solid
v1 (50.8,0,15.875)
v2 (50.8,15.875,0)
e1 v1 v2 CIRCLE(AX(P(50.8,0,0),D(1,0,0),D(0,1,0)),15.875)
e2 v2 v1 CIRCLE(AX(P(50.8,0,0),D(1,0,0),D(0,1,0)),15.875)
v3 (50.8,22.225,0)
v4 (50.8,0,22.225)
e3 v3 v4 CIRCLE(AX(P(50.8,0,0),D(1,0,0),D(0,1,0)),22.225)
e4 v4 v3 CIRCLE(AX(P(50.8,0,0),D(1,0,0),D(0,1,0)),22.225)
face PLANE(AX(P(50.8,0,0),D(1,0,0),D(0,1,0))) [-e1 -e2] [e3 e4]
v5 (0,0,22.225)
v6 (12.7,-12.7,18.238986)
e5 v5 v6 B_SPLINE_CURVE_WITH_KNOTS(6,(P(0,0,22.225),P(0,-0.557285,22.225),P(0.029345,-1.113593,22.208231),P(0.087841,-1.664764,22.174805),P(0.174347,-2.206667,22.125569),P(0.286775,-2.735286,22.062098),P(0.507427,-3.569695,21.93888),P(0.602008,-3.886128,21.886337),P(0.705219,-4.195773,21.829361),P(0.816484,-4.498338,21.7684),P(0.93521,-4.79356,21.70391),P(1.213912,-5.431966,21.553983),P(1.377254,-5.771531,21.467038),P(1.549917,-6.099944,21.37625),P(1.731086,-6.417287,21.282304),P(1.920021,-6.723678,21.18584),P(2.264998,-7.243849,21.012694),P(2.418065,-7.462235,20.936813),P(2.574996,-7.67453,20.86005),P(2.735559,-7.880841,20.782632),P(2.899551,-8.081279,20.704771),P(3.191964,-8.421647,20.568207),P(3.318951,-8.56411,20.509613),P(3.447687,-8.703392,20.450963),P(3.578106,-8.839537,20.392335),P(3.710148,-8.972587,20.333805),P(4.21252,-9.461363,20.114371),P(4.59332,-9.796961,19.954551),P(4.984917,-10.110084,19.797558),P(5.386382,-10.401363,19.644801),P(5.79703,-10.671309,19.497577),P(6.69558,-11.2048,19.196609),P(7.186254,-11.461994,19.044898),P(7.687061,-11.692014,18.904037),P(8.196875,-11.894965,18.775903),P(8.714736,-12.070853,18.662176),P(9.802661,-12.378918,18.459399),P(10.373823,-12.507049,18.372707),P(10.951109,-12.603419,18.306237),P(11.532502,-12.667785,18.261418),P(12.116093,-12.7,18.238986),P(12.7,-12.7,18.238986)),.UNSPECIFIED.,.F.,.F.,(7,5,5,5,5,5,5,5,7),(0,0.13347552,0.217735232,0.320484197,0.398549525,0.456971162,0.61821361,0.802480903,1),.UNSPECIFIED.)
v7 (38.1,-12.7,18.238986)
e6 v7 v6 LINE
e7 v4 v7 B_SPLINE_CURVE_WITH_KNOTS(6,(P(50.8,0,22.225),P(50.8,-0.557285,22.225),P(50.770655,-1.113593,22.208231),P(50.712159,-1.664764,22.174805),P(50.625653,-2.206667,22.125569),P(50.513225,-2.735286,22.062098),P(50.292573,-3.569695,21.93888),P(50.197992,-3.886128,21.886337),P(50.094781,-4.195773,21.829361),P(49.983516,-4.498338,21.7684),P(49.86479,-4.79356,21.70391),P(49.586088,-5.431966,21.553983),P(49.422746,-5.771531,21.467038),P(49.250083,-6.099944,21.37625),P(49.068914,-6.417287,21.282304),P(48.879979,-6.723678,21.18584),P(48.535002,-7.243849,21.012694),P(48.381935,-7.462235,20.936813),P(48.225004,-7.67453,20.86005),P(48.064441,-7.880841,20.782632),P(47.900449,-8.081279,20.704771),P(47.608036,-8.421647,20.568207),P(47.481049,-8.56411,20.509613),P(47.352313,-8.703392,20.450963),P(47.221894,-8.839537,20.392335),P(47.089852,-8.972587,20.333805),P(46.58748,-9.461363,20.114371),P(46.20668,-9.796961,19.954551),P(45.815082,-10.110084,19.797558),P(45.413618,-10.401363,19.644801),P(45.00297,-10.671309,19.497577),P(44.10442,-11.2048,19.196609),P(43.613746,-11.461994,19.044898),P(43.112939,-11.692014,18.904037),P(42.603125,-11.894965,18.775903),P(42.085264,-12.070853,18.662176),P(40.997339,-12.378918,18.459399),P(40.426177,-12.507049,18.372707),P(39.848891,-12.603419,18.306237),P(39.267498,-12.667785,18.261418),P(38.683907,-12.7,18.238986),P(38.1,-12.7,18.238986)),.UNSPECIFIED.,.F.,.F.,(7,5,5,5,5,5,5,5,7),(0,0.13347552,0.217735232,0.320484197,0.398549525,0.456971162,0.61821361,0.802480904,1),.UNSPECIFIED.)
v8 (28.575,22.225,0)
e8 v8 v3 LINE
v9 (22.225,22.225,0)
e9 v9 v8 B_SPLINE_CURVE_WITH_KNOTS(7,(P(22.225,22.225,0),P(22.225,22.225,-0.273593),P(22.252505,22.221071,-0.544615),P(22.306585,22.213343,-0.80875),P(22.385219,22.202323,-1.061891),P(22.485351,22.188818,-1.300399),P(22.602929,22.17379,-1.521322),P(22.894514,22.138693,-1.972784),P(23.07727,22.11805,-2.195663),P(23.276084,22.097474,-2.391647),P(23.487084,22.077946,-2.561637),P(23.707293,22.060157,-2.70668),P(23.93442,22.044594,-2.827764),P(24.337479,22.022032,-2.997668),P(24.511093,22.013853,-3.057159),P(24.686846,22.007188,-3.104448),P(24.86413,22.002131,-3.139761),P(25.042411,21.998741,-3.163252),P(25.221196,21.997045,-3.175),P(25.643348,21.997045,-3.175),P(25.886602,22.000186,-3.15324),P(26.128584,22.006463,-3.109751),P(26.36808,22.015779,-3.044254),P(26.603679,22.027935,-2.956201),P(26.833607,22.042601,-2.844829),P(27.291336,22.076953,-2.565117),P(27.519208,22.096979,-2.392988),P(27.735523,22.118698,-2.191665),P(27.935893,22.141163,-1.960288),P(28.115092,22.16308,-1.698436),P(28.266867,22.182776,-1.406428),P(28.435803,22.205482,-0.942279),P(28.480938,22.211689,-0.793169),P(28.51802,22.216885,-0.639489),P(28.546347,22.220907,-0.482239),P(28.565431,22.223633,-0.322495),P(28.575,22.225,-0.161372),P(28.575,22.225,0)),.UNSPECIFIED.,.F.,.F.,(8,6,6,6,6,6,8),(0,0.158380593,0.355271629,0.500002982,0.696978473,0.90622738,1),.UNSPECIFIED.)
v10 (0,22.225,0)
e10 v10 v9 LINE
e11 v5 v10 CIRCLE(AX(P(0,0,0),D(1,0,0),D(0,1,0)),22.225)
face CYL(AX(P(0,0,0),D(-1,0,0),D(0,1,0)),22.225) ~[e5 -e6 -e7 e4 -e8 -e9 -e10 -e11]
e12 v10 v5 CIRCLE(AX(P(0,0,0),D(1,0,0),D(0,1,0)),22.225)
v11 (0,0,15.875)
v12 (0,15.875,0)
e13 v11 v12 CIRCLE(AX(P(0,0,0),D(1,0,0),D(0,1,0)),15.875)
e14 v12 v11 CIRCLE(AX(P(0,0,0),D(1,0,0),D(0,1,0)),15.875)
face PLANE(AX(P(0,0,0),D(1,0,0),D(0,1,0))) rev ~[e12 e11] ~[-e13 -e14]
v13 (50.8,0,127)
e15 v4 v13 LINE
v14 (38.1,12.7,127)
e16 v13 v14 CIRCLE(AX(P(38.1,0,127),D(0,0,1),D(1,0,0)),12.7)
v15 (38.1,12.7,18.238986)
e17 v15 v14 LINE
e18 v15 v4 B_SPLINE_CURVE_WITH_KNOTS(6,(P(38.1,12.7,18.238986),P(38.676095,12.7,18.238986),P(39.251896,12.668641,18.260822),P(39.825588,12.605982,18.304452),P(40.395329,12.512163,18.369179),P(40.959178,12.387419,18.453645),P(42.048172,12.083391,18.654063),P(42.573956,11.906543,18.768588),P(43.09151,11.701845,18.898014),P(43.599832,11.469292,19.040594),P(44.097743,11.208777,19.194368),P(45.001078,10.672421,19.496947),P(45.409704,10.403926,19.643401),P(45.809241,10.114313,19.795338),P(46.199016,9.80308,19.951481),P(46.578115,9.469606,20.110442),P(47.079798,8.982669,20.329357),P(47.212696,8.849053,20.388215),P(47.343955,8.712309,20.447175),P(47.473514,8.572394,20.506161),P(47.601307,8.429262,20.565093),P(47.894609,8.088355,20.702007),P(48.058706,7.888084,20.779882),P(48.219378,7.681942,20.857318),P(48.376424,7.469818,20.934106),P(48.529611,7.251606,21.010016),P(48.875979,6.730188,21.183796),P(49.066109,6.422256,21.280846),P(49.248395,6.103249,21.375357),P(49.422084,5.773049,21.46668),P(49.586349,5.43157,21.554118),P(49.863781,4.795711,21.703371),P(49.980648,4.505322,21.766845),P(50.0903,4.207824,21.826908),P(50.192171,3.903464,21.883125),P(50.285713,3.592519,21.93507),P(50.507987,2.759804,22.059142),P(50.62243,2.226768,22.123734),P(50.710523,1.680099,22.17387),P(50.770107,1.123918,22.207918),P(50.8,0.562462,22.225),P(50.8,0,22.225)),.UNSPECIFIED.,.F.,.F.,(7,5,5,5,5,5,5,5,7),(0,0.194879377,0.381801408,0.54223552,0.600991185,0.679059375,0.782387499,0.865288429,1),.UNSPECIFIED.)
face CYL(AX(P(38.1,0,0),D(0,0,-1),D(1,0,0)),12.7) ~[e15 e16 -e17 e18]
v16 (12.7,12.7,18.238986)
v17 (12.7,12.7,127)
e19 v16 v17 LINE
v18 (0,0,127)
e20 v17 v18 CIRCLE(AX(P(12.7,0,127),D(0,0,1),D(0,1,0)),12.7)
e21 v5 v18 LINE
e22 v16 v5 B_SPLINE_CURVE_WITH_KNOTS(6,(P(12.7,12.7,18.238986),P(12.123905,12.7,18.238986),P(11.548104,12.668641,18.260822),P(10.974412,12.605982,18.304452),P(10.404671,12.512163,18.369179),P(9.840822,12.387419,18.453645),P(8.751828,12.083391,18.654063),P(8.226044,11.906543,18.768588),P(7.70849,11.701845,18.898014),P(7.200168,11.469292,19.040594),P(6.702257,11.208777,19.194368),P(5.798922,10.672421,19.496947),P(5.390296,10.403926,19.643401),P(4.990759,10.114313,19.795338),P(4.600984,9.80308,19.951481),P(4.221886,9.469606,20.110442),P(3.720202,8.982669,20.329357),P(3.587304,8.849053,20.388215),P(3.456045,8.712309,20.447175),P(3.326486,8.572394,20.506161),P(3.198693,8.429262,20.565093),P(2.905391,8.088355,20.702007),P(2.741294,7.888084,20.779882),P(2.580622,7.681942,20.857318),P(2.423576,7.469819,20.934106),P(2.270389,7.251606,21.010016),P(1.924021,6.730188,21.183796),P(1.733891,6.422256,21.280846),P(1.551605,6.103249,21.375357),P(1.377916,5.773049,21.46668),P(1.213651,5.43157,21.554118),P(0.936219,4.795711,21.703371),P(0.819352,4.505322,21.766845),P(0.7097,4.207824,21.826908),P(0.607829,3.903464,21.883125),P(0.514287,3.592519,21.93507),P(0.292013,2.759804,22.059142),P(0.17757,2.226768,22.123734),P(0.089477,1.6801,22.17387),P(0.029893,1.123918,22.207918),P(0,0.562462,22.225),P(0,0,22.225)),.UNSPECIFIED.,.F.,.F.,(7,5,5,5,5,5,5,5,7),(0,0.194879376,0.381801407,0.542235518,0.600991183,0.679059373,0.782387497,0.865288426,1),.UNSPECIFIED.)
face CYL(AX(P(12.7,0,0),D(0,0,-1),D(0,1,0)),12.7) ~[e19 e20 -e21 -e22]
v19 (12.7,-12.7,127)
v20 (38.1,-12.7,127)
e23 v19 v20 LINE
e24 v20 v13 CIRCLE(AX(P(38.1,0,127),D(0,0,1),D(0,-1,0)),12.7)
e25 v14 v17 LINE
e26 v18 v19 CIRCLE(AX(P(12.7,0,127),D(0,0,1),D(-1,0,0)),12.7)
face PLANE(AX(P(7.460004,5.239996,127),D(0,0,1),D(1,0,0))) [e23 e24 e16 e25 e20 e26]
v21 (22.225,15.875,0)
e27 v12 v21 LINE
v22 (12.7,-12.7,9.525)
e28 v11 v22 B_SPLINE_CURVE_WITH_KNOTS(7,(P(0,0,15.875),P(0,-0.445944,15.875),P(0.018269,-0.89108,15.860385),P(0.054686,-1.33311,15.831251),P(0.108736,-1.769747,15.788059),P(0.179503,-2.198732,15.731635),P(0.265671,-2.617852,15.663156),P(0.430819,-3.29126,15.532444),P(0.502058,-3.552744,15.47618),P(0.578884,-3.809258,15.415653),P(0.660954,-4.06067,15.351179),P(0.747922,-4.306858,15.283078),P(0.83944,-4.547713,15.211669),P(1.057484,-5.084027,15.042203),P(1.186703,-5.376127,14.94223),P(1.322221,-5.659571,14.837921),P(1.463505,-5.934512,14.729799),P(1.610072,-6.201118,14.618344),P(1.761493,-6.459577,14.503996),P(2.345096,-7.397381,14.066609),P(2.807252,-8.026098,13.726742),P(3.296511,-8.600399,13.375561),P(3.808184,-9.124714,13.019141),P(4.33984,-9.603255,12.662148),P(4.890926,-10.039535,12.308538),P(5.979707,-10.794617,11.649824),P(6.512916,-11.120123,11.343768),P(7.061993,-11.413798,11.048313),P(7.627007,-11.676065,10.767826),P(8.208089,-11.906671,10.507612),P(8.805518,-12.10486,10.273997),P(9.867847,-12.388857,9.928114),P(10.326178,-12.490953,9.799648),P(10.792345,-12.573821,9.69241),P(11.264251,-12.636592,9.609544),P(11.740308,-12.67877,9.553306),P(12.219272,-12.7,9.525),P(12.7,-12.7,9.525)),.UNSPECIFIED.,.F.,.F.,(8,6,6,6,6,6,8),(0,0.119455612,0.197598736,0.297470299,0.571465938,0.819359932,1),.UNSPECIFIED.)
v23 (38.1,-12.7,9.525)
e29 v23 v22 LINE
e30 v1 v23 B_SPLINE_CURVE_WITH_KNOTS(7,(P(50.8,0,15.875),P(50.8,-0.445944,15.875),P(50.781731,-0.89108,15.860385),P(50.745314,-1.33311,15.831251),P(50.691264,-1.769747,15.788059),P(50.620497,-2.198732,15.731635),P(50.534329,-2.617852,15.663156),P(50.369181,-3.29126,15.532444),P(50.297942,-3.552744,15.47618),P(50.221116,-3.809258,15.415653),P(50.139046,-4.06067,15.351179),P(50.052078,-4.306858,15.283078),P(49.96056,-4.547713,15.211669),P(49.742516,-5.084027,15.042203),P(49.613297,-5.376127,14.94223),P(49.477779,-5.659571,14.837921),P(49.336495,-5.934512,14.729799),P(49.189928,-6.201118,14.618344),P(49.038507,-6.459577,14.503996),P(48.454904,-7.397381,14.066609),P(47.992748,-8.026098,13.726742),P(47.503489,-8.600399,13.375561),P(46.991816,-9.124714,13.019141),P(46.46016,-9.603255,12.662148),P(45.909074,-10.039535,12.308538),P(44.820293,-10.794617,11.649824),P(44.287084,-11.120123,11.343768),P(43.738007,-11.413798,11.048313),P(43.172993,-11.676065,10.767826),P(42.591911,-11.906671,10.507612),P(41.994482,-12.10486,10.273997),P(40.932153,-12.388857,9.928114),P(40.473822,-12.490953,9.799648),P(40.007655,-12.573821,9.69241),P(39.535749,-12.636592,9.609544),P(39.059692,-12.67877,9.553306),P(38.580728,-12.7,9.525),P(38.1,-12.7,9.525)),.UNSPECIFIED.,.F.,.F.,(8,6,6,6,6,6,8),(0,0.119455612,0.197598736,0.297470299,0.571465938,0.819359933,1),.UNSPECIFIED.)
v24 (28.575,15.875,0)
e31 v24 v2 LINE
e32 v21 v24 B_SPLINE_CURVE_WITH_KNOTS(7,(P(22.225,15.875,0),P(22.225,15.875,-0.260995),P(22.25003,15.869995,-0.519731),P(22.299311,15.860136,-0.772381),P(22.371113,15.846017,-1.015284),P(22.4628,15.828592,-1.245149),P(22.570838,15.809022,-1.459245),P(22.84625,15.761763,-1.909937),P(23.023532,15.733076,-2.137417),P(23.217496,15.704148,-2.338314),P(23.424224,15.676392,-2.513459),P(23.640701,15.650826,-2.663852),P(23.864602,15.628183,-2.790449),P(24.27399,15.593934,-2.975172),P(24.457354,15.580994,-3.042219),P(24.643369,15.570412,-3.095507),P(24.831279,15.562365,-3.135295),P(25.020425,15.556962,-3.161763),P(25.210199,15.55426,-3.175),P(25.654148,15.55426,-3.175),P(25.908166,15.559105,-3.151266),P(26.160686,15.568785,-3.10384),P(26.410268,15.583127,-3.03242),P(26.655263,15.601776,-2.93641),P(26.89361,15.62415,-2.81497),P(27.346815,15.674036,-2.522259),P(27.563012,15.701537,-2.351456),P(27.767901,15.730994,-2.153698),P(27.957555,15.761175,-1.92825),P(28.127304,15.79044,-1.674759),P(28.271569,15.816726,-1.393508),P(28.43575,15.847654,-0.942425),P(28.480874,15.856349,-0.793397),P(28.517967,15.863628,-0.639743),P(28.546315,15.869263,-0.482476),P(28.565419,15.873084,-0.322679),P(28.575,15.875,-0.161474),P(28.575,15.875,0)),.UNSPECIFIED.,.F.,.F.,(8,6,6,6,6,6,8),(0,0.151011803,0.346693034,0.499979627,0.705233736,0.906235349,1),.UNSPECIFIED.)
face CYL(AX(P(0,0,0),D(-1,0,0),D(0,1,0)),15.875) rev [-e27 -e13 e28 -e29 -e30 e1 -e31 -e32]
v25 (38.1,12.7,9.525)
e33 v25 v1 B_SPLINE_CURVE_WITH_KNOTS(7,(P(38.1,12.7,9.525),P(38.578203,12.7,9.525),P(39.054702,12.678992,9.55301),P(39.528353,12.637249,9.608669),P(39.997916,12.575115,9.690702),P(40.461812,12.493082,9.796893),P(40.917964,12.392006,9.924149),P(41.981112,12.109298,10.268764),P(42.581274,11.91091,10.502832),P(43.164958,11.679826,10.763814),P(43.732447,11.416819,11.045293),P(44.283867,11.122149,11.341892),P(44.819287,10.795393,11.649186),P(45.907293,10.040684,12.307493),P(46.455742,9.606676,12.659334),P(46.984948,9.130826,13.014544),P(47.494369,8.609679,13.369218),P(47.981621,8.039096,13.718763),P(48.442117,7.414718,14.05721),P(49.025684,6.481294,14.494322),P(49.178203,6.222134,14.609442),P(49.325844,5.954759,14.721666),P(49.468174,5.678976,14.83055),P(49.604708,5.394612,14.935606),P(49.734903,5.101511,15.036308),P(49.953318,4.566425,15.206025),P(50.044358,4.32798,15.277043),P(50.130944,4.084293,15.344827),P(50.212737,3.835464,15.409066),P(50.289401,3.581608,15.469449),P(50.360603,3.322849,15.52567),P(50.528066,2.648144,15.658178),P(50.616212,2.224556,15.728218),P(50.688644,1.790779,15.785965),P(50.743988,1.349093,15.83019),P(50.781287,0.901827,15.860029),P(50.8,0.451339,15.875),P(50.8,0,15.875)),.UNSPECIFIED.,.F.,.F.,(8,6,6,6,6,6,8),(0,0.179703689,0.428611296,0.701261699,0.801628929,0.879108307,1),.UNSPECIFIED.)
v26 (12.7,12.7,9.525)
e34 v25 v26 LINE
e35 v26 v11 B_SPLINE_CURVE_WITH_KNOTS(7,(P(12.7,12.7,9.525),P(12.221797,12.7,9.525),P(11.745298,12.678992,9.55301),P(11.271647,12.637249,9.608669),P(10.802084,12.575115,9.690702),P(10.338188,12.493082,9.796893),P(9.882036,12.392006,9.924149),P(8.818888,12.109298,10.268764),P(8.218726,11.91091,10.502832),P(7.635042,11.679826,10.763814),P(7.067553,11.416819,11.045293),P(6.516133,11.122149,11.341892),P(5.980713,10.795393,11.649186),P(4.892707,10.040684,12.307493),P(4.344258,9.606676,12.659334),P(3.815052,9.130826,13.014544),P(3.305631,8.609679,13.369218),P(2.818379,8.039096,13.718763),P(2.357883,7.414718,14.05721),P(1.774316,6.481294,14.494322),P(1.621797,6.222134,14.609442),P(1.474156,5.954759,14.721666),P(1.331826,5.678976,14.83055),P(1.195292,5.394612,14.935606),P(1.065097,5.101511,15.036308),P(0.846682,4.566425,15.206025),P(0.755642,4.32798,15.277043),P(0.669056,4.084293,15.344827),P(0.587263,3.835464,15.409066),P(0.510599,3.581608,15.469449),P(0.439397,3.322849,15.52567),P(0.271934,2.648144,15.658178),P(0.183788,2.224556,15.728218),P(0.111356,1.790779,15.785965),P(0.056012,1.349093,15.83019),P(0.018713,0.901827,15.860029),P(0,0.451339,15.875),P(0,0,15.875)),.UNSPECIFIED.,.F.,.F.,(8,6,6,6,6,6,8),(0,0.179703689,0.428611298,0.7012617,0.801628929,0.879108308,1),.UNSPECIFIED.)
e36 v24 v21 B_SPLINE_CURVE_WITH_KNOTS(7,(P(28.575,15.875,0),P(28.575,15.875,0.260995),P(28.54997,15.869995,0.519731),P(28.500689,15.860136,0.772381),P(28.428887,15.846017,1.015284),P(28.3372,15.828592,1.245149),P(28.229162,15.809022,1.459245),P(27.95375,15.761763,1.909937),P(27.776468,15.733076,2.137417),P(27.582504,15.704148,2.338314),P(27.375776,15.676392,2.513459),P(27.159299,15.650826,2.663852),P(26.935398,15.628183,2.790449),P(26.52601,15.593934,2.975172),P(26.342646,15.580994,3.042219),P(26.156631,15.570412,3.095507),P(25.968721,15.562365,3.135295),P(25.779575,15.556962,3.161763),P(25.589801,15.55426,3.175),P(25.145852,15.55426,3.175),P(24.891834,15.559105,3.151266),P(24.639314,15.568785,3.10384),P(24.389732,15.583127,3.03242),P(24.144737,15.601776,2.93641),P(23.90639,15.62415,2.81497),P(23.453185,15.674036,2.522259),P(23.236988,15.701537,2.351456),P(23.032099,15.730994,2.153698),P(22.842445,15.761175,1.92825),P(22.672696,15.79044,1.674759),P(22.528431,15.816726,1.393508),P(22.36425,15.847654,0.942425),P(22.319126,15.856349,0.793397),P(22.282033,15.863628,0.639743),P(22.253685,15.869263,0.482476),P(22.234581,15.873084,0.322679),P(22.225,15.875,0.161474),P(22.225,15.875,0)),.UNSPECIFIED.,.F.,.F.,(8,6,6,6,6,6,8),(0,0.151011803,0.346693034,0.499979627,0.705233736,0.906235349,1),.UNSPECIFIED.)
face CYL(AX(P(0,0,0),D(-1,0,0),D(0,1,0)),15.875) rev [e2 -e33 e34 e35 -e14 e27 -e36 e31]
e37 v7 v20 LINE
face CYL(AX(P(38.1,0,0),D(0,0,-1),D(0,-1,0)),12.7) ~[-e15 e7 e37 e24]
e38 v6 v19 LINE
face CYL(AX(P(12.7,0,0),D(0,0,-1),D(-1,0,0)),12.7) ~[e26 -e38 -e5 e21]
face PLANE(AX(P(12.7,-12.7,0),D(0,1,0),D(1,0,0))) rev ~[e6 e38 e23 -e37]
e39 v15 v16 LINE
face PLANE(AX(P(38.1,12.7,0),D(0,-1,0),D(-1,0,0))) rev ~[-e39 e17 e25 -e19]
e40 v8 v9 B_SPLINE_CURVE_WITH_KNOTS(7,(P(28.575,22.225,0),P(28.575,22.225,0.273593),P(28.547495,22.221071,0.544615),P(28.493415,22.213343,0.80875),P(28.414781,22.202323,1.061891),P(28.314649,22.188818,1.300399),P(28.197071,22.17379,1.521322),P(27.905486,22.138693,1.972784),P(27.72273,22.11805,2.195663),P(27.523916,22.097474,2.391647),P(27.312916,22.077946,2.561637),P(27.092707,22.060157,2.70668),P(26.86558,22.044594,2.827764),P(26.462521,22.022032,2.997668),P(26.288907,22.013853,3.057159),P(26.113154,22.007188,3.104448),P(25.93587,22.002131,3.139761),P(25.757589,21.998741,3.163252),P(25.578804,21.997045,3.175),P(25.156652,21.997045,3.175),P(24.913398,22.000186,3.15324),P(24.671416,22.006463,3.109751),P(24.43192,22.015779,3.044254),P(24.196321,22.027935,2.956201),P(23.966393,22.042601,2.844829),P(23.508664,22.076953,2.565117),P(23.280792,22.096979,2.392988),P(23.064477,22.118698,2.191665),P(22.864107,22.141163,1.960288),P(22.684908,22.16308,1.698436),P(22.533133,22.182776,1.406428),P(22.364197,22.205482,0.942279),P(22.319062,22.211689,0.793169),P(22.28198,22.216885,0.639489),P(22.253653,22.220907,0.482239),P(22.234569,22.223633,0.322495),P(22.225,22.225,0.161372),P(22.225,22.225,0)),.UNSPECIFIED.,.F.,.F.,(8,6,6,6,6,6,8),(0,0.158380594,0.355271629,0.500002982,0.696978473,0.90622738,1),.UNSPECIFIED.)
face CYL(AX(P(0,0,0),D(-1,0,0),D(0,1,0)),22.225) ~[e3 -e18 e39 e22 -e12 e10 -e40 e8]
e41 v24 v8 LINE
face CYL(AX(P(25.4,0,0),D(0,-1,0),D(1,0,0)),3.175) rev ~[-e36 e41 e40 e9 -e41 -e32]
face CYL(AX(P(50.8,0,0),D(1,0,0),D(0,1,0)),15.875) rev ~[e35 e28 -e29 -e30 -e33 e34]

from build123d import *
from build123d import SkipClean  # not in build123d's __all__

# Parameters (mm, degrees)
F0_R     = 22.225
F0_R_2   = 15.875
F1_DEPTH = 50.8
F2_R     = 3.175
F3_DEPTH = 37.592
F5_DEPTH = 127
F6_R     = 15.875
F7_DEPTH = 70.104


with BuildPart() as f1:
    # F0 (on Right) → F1 (new body)
    with BuildSketch(Plane.YZ):
        Circle(F0_R)
        Circle(F0_R_2, mode=Mode.SUBTRACT)
    extrude(amount=F1_DEPTH)

    # F2 (on Front) → F3 (cut)
    with BuildSketch(Plane.XZ):
        with Locations((25.4, 0)):
            Circle(F2_R)
    extrude(amount=-F3_DEPTH, mode=Mode.SUBTRACT)

    # F4 (on Top) → F5 (join)
    with BuildSketch(Plane.XY):
        with BuildLine():
            ThreePointArc((12.7, 12.7), (3.7197438789, 8.9802561211), (0, 0))
            Line((0, 0), (12.7, 0))
            Line((12.7, 0), (12.7, 12.7))
        make_face()
        with BuildLine():
            Line((12.7, 0), (0, 0))
            ThreePointArc((0, 0), (3.7197438789, -8.9802561211), (12.7, -12.7))
            Line((12.7, -12.7), (12.7, 0))
        make_face()
        with BuildLine():
            Line((12.7, 12.7), (12.7, 0))
            Line((12.7, 0), (25.4, 0))
            ThreePointArc((25.4, 0), (21.6802561211, 8.9802561211), (12.7, 12.7))
        make_face()
        with BuildLine():
            Line((25.4, 0), (12.7, 0))
            Line((12.7, 0), (12.7, -12.7))
            ThreePointArc((12.7, -12.7), (21.6802561211, -8.9802561211), (25.4, 0))
        make_face()
        with BuildLine():
            Line((38.1, 12.7), (12.7, 12.7))
            ThreePointArc((12.7, 12.7), (21.6802561211, 8.9802561211), (25.4, 0))
            ThreePointArc((25.4, 0), (29.1197438789, 8.9802561211), (38.1, 12.7))
        make_face()
        with BuildLine():
            ThreePointArc((25.4, 0), (21.6802561211, -8.9802561211), (12.7, -12.7))
            Line((12.7, -12.7), (38.1, -12.7))
            ThreePointArc((38.1, -12.7), (29.1197438789, -8.9802561211), (25.4, 0))
        make_face()
        with BuildLine():
            ThreePointArc((38.1, 12.7), (29.1197438789, 8.9802561211), (25.4, 0))
            Line((25.4, 0), (38.1, 0))
            Line((38.1, 0), (38.1, 12.7))
        make_face()
        with BuildLine():
            Line((38.1, 0), (25.4, 0))
            ThreePointArc((25.4, 0), (29.1197438789, -8.9802561211), (38.1, -12.7))
            Line((38.1, -12.7), (38.1, 0))
        make_face()
        with BuildLine():
            ThreePointArc((50.8, 0), (47.0802561211, 8.9802561211), (38.1, 12.7))
            Line((38.1, 12.7), (38.1, 0))
            Line((38.1, 0), (38.1, -12.7))
            ThreePointArc((38.1, -12.7), (47.0802561211, -8.9802561211), (50.8, 0))
        make_face()
    with SkipClean():  # cleaning this boolean's faces spoils the solid; the shape is the same uncleaned
        extrude(amount=F5_DEPTH)

    # F6 (on face) → F7 (cut)
    with BuildSketch(Plane.YZ.offset(50.8)):
        Circle(F6_R)
    with SkipClean():  # cleaning this boolean's faces spoils the solid; the shape is the same uncleaned
        extrude(amount=-F7_DEPTH, mode=Mode.SUBTRACT)


solid = f1.part
